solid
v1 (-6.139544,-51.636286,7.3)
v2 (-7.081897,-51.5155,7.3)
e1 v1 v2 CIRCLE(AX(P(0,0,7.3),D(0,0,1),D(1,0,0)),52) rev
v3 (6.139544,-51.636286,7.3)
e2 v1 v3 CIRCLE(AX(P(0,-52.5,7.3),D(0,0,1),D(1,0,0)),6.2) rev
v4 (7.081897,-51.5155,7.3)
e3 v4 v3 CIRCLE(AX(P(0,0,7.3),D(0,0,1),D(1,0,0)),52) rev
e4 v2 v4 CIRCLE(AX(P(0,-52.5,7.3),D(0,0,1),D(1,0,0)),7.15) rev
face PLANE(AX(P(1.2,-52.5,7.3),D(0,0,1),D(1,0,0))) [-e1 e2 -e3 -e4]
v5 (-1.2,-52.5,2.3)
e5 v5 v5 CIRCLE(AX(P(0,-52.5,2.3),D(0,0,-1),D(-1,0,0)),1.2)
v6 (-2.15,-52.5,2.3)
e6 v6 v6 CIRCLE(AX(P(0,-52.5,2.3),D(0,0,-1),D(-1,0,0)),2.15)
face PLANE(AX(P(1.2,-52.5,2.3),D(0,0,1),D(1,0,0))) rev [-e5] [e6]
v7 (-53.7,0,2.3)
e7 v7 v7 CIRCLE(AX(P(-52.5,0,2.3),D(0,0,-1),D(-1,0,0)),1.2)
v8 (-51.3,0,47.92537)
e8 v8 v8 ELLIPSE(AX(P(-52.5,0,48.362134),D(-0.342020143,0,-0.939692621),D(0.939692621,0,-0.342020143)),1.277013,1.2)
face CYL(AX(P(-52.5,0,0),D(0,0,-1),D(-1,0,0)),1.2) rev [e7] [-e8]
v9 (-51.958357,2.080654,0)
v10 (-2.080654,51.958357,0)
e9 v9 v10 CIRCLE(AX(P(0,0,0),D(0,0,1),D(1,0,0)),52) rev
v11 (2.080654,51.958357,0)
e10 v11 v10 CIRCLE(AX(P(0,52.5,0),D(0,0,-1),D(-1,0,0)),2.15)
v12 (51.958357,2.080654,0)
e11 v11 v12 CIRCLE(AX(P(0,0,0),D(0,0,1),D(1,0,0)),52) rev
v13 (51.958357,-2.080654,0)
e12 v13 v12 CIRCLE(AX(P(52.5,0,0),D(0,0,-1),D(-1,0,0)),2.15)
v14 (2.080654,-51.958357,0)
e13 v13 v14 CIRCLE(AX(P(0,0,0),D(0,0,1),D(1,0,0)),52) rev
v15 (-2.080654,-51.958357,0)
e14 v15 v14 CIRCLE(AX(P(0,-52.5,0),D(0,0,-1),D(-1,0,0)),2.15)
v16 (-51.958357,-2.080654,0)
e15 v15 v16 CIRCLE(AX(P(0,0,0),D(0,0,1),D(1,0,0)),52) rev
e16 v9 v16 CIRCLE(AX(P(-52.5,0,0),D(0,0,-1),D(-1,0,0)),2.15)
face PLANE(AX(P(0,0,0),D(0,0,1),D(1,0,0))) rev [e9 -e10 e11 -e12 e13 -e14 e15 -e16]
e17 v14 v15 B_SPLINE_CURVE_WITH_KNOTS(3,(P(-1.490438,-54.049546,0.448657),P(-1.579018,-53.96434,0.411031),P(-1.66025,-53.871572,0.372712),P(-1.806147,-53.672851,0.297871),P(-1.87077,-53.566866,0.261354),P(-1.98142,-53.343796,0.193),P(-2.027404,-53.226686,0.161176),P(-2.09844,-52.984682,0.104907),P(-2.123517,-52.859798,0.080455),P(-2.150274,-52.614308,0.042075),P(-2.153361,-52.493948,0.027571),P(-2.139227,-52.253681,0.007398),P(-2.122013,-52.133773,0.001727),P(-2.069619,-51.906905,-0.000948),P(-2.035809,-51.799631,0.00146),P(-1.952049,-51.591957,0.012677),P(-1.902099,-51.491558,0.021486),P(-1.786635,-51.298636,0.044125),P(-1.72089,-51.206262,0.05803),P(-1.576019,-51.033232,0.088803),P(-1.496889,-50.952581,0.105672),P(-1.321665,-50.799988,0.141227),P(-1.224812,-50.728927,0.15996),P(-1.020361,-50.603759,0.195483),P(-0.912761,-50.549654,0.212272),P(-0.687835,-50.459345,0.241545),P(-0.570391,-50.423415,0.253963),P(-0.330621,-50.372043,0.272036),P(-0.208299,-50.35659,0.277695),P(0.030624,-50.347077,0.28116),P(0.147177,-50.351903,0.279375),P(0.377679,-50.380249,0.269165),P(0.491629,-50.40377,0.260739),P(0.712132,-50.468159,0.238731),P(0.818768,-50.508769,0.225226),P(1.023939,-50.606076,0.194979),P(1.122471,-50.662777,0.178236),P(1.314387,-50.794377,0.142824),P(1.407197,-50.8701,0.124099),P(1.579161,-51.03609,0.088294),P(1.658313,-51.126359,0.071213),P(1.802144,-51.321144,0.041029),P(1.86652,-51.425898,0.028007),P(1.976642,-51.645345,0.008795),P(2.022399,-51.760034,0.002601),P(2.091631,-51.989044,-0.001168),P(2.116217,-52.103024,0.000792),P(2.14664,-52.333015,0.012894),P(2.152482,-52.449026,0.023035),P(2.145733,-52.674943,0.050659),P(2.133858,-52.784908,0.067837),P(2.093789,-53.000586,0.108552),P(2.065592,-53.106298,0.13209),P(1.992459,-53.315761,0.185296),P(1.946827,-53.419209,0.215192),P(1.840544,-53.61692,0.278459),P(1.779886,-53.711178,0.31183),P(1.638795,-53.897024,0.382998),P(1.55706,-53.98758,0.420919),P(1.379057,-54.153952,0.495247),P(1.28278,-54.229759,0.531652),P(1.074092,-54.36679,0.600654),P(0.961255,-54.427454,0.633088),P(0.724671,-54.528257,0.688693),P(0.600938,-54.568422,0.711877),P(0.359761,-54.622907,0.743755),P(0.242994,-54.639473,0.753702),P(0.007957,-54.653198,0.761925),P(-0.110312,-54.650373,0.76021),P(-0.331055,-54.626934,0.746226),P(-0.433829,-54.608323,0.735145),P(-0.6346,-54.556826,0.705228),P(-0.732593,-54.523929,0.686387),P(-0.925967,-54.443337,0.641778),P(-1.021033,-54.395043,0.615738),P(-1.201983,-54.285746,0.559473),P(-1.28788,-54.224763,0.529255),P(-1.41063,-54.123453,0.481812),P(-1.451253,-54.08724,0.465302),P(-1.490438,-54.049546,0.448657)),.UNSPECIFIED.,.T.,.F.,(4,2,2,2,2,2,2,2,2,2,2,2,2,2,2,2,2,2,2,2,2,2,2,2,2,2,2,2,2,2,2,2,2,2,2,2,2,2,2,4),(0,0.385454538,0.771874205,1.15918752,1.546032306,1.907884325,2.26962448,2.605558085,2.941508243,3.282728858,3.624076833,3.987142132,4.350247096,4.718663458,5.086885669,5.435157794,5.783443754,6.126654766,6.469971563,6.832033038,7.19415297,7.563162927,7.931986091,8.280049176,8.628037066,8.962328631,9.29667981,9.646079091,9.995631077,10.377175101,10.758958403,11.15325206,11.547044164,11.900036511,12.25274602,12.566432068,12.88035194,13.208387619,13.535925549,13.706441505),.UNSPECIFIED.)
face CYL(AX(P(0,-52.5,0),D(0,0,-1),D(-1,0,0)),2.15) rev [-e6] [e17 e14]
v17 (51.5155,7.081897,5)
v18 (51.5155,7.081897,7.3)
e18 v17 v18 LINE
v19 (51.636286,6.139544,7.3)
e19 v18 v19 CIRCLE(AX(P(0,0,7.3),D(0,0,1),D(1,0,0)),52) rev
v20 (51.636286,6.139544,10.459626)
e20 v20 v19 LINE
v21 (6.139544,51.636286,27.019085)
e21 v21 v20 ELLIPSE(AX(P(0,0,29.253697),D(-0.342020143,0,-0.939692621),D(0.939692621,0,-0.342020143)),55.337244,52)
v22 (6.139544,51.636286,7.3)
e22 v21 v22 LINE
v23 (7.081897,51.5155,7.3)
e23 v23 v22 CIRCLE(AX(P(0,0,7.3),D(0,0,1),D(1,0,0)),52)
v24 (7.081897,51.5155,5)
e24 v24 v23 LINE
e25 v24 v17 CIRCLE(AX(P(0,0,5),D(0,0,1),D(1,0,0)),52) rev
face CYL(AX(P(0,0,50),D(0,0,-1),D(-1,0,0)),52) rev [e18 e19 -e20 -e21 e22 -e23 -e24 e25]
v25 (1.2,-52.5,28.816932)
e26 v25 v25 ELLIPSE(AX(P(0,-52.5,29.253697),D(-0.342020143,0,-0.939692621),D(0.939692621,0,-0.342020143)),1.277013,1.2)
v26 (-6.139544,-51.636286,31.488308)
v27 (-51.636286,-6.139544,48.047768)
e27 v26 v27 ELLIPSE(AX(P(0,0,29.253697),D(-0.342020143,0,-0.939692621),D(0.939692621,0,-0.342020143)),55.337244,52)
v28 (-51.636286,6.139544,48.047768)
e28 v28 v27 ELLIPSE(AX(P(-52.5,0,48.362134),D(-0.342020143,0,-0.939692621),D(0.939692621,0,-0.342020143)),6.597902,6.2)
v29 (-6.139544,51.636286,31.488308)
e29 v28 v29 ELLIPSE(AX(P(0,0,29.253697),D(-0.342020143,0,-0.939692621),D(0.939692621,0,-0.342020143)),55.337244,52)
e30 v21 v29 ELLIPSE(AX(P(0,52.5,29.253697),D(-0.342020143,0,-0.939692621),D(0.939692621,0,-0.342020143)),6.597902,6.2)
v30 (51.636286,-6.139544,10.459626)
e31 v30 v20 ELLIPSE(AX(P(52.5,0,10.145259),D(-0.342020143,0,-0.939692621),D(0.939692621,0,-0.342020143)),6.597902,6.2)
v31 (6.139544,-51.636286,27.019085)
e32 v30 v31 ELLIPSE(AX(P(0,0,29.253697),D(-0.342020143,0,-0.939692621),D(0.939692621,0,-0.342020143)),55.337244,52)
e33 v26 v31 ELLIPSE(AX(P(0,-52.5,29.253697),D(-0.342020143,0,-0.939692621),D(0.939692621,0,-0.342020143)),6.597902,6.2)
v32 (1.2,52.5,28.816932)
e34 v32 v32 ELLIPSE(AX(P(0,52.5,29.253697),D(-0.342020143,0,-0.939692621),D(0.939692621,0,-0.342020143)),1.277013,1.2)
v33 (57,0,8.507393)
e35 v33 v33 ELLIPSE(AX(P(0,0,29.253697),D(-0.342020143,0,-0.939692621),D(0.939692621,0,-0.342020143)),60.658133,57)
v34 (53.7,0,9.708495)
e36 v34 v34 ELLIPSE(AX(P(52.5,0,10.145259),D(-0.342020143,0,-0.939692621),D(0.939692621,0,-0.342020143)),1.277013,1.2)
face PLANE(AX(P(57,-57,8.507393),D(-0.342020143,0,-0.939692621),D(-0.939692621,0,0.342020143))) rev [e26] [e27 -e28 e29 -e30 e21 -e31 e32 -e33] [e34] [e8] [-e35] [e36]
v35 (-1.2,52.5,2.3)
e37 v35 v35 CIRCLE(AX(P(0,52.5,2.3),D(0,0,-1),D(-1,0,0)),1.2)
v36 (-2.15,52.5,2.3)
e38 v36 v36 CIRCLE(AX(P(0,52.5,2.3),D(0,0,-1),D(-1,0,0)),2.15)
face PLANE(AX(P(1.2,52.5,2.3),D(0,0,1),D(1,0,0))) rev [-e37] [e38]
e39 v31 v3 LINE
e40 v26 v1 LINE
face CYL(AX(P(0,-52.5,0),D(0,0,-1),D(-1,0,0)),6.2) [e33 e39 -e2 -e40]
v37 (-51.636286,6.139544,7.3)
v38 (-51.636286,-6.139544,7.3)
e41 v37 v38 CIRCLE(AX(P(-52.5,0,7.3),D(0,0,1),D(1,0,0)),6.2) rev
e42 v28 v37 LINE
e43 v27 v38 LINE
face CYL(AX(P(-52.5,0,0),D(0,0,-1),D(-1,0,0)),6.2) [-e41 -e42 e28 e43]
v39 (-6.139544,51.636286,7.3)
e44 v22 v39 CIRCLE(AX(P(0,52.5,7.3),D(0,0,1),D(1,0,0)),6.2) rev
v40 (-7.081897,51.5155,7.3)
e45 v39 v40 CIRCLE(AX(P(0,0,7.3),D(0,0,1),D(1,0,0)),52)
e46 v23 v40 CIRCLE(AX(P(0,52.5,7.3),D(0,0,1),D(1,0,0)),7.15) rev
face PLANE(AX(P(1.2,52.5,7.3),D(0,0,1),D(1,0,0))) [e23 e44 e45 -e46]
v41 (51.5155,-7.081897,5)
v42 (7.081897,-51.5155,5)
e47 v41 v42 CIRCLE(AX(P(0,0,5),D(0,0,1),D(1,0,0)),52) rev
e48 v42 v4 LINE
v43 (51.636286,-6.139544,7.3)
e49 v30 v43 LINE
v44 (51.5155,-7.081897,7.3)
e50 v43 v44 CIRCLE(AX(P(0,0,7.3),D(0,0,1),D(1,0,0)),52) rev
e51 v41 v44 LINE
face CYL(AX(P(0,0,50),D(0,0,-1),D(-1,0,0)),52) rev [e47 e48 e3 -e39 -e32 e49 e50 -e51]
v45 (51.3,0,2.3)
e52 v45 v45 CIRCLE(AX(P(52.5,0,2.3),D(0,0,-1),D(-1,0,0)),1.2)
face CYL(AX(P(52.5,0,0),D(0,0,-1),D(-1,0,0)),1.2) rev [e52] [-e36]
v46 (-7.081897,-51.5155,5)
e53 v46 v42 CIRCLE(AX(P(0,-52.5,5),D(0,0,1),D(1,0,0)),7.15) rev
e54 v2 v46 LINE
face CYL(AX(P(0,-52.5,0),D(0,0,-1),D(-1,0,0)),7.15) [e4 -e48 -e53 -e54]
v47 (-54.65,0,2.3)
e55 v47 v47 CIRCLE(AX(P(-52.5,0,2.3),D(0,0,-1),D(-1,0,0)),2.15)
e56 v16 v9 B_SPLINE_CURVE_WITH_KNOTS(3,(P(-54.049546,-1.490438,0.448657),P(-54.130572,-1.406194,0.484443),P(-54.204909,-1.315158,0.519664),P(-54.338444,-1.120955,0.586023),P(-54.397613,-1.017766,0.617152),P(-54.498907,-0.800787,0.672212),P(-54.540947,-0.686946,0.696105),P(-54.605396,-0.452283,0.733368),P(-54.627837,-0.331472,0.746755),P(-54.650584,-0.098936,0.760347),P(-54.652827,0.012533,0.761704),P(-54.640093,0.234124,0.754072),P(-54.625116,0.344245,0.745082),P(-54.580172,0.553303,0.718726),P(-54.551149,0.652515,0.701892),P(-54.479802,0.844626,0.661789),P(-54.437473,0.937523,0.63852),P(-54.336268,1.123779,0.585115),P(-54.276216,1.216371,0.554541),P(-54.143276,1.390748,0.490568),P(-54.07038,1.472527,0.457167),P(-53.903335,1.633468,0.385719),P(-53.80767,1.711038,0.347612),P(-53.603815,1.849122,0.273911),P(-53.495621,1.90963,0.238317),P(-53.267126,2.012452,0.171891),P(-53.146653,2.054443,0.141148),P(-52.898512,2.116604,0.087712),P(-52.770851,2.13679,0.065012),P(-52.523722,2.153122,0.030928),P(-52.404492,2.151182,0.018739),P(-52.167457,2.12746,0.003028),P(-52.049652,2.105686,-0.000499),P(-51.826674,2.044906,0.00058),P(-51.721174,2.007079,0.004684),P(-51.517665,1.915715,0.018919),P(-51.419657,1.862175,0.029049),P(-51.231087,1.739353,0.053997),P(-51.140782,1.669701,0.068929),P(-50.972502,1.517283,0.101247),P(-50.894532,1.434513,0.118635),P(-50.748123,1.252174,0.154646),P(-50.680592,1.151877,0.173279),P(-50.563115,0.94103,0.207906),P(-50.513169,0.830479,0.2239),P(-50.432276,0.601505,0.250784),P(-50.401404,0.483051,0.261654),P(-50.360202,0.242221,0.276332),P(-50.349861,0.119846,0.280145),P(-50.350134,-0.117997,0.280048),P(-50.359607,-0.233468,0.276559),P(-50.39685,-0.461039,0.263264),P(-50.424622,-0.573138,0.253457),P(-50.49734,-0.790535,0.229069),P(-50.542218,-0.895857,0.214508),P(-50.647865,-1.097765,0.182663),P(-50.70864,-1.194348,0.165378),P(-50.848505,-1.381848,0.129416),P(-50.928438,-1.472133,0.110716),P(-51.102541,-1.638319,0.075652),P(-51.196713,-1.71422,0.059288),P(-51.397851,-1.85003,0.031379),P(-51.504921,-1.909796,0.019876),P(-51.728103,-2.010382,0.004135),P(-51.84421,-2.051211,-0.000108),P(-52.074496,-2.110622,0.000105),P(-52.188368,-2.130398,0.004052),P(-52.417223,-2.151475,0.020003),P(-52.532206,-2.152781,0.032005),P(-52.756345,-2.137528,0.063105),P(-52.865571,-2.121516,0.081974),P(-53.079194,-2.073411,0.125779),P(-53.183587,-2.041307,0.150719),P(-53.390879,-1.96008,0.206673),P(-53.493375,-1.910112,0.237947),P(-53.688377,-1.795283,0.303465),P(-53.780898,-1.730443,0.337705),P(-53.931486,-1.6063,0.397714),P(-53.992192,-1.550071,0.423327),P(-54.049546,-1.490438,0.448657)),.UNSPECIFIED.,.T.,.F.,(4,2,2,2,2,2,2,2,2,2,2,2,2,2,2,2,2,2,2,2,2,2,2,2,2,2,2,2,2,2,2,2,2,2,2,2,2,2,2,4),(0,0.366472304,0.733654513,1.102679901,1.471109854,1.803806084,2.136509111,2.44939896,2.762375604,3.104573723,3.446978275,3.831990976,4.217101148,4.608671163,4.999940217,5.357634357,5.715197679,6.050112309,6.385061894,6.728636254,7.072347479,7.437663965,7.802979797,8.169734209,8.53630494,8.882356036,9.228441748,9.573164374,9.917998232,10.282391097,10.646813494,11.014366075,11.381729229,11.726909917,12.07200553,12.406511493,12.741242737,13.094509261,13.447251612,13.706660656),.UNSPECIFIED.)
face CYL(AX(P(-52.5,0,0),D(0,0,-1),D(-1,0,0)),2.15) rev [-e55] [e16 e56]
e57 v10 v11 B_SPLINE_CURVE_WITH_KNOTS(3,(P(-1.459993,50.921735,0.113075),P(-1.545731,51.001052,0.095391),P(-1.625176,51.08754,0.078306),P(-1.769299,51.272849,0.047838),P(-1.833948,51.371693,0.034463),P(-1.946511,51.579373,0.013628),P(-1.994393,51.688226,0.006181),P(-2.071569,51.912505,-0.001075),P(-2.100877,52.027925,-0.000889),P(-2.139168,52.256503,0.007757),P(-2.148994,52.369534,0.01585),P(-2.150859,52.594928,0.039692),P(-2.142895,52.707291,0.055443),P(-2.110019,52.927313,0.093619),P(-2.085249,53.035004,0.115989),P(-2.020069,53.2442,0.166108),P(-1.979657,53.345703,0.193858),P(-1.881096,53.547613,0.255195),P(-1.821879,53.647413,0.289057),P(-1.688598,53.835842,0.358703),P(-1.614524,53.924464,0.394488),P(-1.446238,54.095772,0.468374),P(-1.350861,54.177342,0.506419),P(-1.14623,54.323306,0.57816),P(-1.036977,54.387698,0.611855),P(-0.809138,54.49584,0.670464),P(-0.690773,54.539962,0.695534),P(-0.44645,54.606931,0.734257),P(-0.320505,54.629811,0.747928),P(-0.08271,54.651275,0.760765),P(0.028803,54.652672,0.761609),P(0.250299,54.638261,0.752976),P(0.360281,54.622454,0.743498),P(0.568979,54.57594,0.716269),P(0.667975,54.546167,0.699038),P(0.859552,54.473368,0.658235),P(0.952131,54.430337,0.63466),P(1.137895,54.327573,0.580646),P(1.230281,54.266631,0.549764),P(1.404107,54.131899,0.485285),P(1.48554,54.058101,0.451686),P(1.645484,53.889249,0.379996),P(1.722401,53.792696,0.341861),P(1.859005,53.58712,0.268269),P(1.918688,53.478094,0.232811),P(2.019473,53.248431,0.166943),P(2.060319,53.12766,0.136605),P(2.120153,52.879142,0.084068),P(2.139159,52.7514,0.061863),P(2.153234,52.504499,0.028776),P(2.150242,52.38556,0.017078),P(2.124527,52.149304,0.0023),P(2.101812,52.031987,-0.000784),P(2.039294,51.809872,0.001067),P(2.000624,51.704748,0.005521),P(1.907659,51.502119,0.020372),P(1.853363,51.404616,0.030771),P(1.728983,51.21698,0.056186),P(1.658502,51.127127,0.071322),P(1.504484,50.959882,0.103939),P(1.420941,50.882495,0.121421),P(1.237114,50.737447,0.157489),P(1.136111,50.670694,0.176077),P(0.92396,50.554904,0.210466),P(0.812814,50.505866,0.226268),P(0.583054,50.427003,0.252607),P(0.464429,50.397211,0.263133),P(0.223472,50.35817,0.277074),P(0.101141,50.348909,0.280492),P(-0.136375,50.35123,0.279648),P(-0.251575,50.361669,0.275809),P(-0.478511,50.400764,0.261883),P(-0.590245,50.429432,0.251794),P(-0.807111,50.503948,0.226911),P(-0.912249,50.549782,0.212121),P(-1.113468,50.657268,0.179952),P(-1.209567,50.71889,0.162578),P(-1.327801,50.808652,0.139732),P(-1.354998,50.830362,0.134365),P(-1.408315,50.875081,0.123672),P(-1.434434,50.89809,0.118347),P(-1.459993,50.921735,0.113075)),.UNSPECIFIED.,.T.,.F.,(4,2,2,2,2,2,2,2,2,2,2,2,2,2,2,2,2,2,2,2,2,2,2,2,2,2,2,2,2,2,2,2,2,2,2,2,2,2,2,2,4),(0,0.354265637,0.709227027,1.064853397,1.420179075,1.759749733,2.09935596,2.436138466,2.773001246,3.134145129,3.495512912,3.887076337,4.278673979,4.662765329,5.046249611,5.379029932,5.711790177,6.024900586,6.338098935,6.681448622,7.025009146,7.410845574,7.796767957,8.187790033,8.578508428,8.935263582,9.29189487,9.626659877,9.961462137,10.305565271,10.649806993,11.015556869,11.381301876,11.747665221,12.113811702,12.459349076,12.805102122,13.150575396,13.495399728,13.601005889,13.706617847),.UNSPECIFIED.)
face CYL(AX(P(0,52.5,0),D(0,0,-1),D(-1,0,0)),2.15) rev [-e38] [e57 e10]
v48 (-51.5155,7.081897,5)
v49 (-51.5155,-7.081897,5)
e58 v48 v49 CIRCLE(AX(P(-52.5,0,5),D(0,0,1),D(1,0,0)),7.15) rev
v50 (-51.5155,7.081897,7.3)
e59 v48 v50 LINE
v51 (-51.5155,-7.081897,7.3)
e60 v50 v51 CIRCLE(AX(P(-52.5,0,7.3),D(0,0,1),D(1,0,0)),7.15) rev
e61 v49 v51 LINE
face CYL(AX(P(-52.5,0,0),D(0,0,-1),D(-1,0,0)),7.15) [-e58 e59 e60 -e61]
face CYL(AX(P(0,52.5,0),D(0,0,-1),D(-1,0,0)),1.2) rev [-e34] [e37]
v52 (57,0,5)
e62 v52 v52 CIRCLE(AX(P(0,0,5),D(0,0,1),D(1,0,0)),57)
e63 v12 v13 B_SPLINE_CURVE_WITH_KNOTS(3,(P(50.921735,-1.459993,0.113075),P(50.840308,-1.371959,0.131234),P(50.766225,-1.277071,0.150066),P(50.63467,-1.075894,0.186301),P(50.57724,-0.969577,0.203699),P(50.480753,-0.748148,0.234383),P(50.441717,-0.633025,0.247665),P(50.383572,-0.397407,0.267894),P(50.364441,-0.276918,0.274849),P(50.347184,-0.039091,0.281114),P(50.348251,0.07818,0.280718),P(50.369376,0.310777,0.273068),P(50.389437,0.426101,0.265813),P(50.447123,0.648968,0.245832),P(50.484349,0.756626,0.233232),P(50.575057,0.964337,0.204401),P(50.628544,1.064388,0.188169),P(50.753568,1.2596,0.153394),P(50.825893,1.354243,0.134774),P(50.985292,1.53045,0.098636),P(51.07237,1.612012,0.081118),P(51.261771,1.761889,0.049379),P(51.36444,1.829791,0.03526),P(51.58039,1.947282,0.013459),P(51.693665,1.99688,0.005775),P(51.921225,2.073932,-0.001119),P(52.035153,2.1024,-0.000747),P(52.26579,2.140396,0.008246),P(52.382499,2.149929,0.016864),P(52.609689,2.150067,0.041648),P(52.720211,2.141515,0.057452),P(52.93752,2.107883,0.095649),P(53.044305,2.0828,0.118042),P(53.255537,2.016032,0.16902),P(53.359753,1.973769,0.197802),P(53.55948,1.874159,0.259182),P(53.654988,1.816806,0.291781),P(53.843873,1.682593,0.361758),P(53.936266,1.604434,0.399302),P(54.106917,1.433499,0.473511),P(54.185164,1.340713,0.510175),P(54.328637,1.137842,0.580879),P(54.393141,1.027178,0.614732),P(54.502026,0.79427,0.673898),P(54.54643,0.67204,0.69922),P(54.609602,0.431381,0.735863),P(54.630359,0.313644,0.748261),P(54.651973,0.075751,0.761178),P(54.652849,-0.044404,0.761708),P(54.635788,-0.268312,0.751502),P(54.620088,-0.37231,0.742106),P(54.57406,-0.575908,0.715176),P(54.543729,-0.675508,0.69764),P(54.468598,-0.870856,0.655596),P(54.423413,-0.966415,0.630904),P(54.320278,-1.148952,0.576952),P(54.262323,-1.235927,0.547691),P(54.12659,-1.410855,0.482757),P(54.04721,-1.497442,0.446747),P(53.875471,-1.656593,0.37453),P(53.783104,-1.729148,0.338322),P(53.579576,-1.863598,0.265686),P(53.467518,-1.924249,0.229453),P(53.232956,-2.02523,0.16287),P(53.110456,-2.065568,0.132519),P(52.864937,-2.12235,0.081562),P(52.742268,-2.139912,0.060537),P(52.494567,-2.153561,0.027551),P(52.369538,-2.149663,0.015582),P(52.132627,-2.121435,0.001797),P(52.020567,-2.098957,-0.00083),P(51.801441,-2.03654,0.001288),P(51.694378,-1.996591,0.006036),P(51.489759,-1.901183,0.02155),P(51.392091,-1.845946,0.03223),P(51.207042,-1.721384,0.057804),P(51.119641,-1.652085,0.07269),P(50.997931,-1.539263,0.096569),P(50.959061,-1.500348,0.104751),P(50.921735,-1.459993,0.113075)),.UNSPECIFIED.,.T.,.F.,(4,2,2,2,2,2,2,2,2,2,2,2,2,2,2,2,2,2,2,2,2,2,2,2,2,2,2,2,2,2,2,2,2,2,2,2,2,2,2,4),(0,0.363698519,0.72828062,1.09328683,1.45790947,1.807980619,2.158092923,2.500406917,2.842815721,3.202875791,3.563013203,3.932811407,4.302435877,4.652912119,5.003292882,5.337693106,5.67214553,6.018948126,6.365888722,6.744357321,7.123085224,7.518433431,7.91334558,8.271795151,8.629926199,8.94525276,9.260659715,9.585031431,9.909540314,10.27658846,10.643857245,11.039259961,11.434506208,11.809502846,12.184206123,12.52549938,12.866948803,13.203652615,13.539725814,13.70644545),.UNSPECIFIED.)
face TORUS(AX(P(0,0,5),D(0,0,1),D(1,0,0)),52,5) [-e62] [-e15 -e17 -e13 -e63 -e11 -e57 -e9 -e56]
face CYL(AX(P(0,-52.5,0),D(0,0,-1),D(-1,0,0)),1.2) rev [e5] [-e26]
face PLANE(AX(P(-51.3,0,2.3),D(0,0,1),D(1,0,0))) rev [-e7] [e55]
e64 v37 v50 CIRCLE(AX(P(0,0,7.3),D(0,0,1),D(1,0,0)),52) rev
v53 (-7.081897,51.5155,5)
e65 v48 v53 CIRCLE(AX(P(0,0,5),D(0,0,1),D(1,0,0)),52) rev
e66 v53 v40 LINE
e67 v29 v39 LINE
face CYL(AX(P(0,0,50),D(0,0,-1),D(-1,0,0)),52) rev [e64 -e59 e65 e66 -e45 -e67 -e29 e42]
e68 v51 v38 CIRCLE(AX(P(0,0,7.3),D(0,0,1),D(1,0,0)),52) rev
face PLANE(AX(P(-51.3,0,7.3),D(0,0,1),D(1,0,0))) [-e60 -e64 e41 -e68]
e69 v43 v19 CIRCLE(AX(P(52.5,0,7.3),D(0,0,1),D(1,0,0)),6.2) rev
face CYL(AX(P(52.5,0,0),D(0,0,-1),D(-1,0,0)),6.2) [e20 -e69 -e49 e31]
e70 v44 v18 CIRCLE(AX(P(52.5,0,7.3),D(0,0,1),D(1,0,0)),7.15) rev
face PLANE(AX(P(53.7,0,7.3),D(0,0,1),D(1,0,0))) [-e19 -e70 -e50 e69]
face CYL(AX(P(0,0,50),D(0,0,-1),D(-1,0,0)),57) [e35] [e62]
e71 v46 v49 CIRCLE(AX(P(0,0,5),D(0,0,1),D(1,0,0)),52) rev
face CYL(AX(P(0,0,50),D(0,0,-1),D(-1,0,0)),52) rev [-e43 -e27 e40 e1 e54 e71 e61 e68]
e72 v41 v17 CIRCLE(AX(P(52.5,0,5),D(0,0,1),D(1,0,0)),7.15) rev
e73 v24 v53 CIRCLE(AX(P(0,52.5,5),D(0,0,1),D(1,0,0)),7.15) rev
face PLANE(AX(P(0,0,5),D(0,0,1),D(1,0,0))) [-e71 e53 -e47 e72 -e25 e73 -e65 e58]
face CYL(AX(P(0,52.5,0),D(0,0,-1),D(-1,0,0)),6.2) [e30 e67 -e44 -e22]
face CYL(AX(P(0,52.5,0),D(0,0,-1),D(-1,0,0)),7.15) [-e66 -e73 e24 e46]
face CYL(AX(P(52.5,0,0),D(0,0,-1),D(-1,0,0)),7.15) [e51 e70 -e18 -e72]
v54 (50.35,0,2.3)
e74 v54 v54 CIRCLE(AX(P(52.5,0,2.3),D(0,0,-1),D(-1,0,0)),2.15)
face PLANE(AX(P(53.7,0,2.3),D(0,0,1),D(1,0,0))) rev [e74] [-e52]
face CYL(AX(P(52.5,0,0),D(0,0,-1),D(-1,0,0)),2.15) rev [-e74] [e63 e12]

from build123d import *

# Parameters (mm, degrees)
SKETCH_1_R                = 57
EXTRUDE_1_DEPTH           = 50
CUT_EXTRUDE_1_DEPTH       = 95.857788294
CUT_EXTRUDE_1_DEPTH_BACK  = 95.857788294
FILLET_1_R                = 5
HOLE_WIZARD_1_D           = 2.4
HOLE_WIZARD_1_CBORE_D     = 4.3
HOLE_WIZARD_1_CBORE_DEPTH = 2.3
PATTERN_CIRCULAR_1_COUNT  = 4
SHELL_START               = 5
SHELL_1_DEPTH             = 43.047767655
SHELL_START_2             = 7.3
SHELL_1_2_DEPTH           = 40.747767655


# Read off the part's stored shape, not the designer's step: 抽壳1
with BuildPart() as part:
    # 草图1 → 凸台-拉伸1 (new body)
    with BuildSketch(Plane.XY):
        Circle(SKETCH_1_R)
    extrude(amount=EXTRUDE_1_DEPTH)

    # 草图2 → 切除-拉伸1 (cut, two sides: drawn at the far end of the back side and taken through both)
    with BuildSketch(Plane(origin=(0, 0, 0), x_dir=(1, 0, 0), z_dir=(0, 1, 0)).offset(-CUT_EXTRUDE_1_DEPTH_BACK)):
        Polygon((-57, -50), (57, -50), (57, -8.507393294), align=None)
    extrude(amount=CUT_EXTRUDE_1_DEPTH + CUT_EXTRUDE_1_DEPTH_BACK, mode=Mode.SUBTRACT)

    # 圆角1
    fillet_1_edges = [part.edges().sort_by_distance(p)[0] for p in [
        (-57, 0, 0),
    ]]
    fillet(fillet_1_edges, radius=FILLET_1_R)

    # 打孔尺寸(%根据)内六角圆柱头螺钉的类型1 (through all)
    with Locations(Plane(origin=(0, 0, 0), x_dir=(-1, 0, 0), z_dir=(0, 0, -1))):
        with Locations((0, 52.5)):
            hole_wizard_1 = CounterBoreHole(HOLE_WIZARD_1_D / 2, HOLE_WIZARD_1_CBORE_D / 2, HOLE_WIZARD_1_CBORE_DEPTH)

    # 阵列(圆周)1: 打孔尺寸(%根据)内六角圆柱头螺钉的类型1 ×4 about axis
    pattern_circular_1_axis = Axis((0, 0, 0), (0, 0, 1))
    for i in range(1, PATTERN_CIRCULAR_1_COUNT):
        add(hole_wizard_1.rotate(pattern_circular_1_axis, i * 360 / PATTERN_CIRCULAR_1_COUNT), mode=Mode.SUBTRACT)

    # 抽壳1 outline → 抽壳1 (cut)
    with BuildSketch(Plane.XY.offset(SHELL_START)):
        with BuildLine():
            ThreePointArc((7.081896621, -51.5155), (36.769552622, -36.769552622), (51.5155, -7.081896621))
            ThreePointArc((51.5155, -7.081896621), (45.35, 0), (51.5155, 7.081896621))
            ThreePointArc((51.5155, 7.081896621), (36.769552622, 36.769552622), (7.081896621, 51.5155))
            ThreePointArc((7.081896621, 51.5155), (0, 45.35), (-7.081896621, 51.5155))
            ThreePointArc((-7.081896621, 51.5155), (-36.769552622, 36.769552622), (-51.5155, 7.081896621))
            ThreePointArc((-51.5155, 7.081896621), (-45.35, 0), (-51.5155, -7.081896621))
            ThreePointArc((-51.5155, -7.081896621), (-36.769552622, -36.769552622), (-7.081896621, -51.5155))
            ThreePointArc((-7.081896621, -51.5155), (0, -45.35), (7.081896621, -51.5155))
        make_face()
    extrude(amount=SHELL_1_DEPTH, mode=Mode.SUBTRACT)

    # Shell 1 2 outline → Shell 1 2 (cut)
    with BuildSketch(Plane.XY.offset(SHELL_START_2)):
        with BuildLine():
            ThreePointArc((51.5155, 7.081896621), (45.35, 0), (51.5155, -7.081896621))
            ThreePointArc((51.5155, -7.081896621), (51.57804505, -6.610996049), (51.636285714, -6.139543764))
            ThreePointArc((51.636285714, -6.139543764), (46.3, 0), (51.636285714, 6.139543764))
            ThreePointArc((51.636285714, 6.139543764), (51.57804505, 6.610996049), (51.5155, 7.081896621))
        make_face()
        with BuildLine():
            ThreePointArc((6.139543764, -51.636285714), (6.610996049, -51.57804505), (7.081896621, -51.5155))
            ThreePointArc((7.081896621, -51.5155), (0, -45.35), (-7.081896621, -51.5155))
            ThreePointArc((-7.081896621, -51.5155), (-6.610996049, -51.57804505), (-6.139543764, -51.636285714))
            ThreePointArc((-6.139543764, -51.636285714), (0, -46.3), (6.139543764, -51.636285714))
        make_face()
        with BuildLine():
            ThreePointArc((-7.081896621, 51.5155), (0, 45.35), (7.081896621, 51.5155))
            ThreePointArc((7.081896621, 51.5155), (6.610996049, 51.57804505), (6.139543764, 51.636285714))
            ThreePointArc((6.139543764, 51.636285714), (0, 46.3), (-6.139543764, 51.636285714))
            ThreePointArc((-6.139543764, 51.636285714), (-6.610996049, 51.57804505), (-7.081896621, 51.5155))
        make_face()
        with BuildLine():
            ThreePointArc((-51.636285714, -6.139543764), (-51.57804505, -6.610996049), (-51.5155, -7.081896621))
            ThreePointArc((-51.5155, -7.081896621), (-45.35, 0), (-51.5155, 7.081896621))
            ThreePointArc((-51.5155, 7.081896621), (-51.57804505, 6.610996049), (-51.636285714, 6.139543764))
            ThreePointArc((-51.636285714, 6.139543764), (-46.3, 0), (-51.636285714, -6.139543764))
        make_face()
    extrude(amount=SHELL_1_2_DEPTH, mode=Mode.SUBTRACT)


solid = part.part
